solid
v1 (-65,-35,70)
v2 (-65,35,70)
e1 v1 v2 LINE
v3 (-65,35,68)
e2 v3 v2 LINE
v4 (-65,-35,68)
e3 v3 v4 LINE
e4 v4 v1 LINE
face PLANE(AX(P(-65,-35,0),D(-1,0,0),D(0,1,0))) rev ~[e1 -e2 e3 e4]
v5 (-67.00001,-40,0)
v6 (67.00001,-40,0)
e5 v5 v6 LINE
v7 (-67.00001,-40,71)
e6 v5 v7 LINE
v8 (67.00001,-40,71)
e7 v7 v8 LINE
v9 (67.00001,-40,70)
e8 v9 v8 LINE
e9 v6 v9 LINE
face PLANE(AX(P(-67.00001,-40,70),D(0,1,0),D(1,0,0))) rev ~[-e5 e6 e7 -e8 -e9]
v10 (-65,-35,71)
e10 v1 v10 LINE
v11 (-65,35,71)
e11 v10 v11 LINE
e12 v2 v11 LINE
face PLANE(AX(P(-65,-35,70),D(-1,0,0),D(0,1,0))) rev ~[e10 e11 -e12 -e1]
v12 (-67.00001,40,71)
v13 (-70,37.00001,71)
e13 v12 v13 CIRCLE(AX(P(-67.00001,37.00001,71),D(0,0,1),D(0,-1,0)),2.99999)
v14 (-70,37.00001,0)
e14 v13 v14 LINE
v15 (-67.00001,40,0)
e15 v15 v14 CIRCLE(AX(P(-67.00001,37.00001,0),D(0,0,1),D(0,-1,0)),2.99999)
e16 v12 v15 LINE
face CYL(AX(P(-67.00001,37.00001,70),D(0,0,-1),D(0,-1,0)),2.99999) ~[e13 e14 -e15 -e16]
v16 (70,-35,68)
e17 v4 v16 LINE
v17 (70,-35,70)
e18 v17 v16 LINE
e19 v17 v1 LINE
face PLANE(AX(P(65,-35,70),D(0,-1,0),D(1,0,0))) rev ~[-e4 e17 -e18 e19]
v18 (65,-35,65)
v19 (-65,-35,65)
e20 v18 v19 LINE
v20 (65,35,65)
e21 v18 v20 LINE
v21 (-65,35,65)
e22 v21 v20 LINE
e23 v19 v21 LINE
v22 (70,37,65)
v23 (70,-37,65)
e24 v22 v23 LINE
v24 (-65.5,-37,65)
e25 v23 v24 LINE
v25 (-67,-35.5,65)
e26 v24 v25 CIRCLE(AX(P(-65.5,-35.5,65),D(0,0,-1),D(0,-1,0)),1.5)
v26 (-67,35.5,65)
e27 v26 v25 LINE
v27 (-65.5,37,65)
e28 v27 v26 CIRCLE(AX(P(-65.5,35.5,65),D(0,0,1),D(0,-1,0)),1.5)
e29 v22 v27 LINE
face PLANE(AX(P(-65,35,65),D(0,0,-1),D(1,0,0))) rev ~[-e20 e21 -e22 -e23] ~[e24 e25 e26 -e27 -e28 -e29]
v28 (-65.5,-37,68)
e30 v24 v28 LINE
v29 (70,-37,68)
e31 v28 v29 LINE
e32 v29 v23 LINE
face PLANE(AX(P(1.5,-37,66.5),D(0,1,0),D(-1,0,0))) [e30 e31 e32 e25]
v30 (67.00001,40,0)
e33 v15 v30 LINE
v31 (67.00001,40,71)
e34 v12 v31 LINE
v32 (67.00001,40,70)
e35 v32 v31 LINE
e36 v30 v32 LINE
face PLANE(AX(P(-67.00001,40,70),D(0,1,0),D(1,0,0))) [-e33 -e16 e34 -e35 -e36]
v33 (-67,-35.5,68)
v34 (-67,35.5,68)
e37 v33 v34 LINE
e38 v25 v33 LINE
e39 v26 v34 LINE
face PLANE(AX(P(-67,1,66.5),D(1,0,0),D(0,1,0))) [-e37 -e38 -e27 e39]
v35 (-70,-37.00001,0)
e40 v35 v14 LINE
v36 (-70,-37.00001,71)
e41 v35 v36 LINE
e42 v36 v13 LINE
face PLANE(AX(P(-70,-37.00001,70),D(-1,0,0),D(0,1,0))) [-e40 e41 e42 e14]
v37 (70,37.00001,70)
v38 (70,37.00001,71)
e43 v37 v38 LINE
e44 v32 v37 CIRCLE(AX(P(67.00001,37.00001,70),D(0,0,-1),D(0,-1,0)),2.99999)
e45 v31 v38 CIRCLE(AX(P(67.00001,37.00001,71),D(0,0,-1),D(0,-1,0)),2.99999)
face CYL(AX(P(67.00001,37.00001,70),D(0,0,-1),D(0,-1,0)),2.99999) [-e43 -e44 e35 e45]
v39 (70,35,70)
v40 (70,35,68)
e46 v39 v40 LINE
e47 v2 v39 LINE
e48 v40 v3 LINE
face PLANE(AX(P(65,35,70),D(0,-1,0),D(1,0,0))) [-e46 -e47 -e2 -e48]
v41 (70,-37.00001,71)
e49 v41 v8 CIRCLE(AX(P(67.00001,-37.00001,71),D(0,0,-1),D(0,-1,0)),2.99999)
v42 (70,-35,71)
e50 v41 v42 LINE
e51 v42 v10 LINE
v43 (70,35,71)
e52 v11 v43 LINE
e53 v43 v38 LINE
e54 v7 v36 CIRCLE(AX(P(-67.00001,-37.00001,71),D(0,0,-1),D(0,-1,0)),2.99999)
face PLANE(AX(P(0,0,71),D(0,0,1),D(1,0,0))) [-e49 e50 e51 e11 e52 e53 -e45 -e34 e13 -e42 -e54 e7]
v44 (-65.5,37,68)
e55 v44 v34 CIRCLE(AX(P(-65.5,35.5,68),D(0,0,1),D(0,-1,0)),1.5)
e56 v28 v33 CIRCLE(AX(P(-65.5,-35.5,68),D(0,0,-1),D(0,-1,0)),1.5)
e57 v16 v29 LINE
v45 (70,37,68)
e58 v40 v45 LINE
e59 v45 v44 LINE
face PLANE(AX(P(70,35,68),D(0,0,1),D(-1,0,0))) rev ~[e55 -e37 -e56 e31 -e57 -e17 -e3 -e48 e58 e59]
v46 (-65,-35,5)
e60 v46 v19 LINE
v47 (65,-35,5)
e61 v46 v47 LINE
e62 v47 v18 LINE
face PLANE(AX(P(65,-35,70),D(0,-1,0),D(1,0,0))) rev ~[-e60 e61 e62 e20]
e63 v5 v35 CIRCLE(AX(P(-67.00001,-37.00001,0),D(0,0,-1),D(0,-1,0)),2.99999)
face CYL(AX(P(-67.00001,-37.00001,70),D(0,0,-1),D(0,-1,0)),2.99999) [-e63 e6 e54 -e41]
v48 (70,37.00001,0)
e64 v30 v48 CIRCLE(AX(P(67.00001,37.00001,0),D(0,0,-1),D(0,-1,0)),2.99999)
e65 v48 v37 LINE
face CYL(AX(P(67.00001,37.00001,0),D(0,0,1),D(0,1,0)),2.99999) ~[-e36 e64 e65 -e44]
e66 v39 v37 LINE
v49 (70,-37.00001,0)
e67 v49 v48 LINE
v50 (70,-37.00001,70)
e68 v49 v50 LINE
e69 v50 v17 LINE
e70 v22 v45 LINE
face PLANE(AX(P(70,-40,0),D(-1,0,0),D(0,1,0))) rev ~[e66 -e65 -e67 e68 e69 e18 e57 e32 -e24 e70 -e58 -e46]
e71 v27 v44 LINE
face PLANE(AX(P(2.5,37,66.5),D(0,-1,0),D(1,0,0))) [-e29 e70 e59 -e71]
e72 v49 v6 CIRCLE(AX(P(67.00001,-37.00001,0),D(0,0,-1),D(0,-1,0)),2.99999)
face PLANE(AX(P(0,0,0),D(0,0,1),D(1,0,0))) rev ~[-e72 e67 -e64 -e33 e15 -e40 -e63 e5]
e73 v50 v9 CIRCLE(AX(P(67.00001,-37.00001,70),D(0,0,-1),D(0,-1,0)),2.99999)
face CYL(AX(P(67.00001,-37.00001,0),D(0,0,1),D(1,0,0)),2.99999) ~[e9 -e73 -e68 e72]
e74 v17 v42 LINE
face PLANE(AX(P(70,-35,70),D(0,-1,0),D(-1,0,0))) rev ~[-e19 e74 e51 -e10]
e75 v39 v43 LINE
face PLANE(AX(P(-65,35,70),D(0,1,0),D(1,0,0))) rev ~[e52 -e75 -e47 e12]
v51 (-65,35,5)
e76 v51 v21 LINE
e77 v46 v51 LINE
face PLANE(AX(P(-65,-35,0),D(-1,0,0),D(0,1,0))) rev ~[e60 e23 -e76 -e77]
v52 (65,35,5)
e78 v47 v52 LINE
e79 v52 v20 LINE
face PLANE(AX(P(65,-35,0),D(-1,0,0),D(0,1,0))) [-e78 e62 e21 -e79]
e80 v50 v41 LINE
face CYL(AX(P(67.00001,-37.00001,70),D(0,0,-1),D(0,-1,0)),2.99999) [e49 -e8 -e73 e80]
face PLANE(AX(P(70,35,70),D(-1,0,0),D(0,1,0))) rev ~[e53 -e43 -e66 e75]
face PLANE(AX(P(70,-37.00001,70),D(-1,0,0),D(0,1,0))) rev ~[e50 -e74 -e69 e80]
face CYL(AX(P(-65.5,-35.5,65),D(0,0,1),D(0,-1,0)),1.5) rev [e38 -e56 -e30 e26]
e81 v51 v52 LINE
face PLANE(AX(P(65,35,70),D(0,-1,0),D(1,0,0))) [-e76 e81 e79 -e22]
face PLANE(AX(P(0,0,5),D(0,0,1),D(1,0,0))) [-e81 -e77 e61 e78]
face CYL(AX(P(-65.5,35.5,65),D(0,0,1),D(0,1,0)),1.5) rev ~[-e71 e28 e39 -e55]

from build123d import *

# Parameters (mm, degrees)
F0_W      = 140
F0_H      = 80
F0_W_2    = 130
F0_H_2    = 70
F1_DEPTH  = 70
F2_DEPTH  = 5
F3_W      = 5
F3_H      = 70
F4_DEPTH  = 5
F6_DEPTH  = 2
F8_DEPTH  = 2
F10_DEPTH = 2
F11_R     = 2.99999
F12_R     = 1.5
F13_DEPTH = 1


# Not quite as in the source:
# - a fillet or chamfer is up to 0.001 mm smaller than in the source, because OpenCascade refuses the exact size


with BuildPart() as f1:
    # F0 (on Top) → F1 (new body)
    with BuildSketch(Plane.XY):
        Rectangle(F0_W, F0_H)
        Rectangle(F0_W_2, F0_H_2, mode=Mode.SUBTRACT)
    extrude(amount=F1_DEPTH)

    # F0 (on Top) → F2 (join)
    with BuildSketch(Plane.XY):
        Rectangle(F0_W_2, F0_H_2)
    extrude(amount=F2_DEPTH)

    # F3 (on face) → F4 (cut)
    with BuildSketch(Plane.XY.offset(70)):
        with Locations((67.5, 0)):
            Rectangle(F3_W, F3_H)
    extrude(amount=-F4_DEPTH, mode=Mode.SUBTRACT)

    # F5 (on face) → F6 (cut)
    with BuildSketch(Plane.XZ.offset(-35)):
        Polygon((65, 65), (70, 65), (70, 68), (-65, 68), (-65, 65), align=None)
    extrude(amount=-F6_DEPTH, mode=Mode.SUBTRACT)

    # F7 (on face) → F8 (cut)
    with BuildSketch(Plane.YZ.offset(-65)):
        Polygon((35, 65), (37, 65), (37, 68), (35, 68), (-35, 68), (-35, 65), align=None)
    extrude(amount=-F8_DEPTH, mode=Mode.SUBTRACT)

    # F9 (on face) → F10 (cut)
    with BuildSketch(Plane(origin=(0, -35, 0), x_dir=(-1, 0, 0), z_dir=(0, 1, 0))):
        Polygon((65, 65), (67, 65), (67, 68), (65, 68), (-70, 68), (-70, 65), (-65, 65), align=None)
    extrude(amount=-F10_DEPTH, mode=Mode.SUBTRACT)

    # F11 (radius 3 in the source; OpenCascade refuses exactly that, so slightly less here)
    f11_edges = [f1.edges().sort_by_distance(p)[0] for p in [
        (-70, -40, 35),
        (-70, 40, 35),
        (70, 40, 35),
        (70, -40, 35),
    ]]
    fillet(f11_edges, radius=F11_R)

    # F12
    f12_edges = [f1.edges().sort_by_distance(p)[0] for p in [
        (-67, -37, 66.5),
        (-67, 37, 66.5),
    ]]
    fillet(f12_edges, radius=F12_R)

    # F13 (add): a face of the model
    f13_faces = [f1.faces().sort_by_distance(p)[0] for p in [
        (-68.3875484503, 0, 70),
    ]]
    extrude(f13_faces, amount=F13_DEPTH)


solid = f1.part
